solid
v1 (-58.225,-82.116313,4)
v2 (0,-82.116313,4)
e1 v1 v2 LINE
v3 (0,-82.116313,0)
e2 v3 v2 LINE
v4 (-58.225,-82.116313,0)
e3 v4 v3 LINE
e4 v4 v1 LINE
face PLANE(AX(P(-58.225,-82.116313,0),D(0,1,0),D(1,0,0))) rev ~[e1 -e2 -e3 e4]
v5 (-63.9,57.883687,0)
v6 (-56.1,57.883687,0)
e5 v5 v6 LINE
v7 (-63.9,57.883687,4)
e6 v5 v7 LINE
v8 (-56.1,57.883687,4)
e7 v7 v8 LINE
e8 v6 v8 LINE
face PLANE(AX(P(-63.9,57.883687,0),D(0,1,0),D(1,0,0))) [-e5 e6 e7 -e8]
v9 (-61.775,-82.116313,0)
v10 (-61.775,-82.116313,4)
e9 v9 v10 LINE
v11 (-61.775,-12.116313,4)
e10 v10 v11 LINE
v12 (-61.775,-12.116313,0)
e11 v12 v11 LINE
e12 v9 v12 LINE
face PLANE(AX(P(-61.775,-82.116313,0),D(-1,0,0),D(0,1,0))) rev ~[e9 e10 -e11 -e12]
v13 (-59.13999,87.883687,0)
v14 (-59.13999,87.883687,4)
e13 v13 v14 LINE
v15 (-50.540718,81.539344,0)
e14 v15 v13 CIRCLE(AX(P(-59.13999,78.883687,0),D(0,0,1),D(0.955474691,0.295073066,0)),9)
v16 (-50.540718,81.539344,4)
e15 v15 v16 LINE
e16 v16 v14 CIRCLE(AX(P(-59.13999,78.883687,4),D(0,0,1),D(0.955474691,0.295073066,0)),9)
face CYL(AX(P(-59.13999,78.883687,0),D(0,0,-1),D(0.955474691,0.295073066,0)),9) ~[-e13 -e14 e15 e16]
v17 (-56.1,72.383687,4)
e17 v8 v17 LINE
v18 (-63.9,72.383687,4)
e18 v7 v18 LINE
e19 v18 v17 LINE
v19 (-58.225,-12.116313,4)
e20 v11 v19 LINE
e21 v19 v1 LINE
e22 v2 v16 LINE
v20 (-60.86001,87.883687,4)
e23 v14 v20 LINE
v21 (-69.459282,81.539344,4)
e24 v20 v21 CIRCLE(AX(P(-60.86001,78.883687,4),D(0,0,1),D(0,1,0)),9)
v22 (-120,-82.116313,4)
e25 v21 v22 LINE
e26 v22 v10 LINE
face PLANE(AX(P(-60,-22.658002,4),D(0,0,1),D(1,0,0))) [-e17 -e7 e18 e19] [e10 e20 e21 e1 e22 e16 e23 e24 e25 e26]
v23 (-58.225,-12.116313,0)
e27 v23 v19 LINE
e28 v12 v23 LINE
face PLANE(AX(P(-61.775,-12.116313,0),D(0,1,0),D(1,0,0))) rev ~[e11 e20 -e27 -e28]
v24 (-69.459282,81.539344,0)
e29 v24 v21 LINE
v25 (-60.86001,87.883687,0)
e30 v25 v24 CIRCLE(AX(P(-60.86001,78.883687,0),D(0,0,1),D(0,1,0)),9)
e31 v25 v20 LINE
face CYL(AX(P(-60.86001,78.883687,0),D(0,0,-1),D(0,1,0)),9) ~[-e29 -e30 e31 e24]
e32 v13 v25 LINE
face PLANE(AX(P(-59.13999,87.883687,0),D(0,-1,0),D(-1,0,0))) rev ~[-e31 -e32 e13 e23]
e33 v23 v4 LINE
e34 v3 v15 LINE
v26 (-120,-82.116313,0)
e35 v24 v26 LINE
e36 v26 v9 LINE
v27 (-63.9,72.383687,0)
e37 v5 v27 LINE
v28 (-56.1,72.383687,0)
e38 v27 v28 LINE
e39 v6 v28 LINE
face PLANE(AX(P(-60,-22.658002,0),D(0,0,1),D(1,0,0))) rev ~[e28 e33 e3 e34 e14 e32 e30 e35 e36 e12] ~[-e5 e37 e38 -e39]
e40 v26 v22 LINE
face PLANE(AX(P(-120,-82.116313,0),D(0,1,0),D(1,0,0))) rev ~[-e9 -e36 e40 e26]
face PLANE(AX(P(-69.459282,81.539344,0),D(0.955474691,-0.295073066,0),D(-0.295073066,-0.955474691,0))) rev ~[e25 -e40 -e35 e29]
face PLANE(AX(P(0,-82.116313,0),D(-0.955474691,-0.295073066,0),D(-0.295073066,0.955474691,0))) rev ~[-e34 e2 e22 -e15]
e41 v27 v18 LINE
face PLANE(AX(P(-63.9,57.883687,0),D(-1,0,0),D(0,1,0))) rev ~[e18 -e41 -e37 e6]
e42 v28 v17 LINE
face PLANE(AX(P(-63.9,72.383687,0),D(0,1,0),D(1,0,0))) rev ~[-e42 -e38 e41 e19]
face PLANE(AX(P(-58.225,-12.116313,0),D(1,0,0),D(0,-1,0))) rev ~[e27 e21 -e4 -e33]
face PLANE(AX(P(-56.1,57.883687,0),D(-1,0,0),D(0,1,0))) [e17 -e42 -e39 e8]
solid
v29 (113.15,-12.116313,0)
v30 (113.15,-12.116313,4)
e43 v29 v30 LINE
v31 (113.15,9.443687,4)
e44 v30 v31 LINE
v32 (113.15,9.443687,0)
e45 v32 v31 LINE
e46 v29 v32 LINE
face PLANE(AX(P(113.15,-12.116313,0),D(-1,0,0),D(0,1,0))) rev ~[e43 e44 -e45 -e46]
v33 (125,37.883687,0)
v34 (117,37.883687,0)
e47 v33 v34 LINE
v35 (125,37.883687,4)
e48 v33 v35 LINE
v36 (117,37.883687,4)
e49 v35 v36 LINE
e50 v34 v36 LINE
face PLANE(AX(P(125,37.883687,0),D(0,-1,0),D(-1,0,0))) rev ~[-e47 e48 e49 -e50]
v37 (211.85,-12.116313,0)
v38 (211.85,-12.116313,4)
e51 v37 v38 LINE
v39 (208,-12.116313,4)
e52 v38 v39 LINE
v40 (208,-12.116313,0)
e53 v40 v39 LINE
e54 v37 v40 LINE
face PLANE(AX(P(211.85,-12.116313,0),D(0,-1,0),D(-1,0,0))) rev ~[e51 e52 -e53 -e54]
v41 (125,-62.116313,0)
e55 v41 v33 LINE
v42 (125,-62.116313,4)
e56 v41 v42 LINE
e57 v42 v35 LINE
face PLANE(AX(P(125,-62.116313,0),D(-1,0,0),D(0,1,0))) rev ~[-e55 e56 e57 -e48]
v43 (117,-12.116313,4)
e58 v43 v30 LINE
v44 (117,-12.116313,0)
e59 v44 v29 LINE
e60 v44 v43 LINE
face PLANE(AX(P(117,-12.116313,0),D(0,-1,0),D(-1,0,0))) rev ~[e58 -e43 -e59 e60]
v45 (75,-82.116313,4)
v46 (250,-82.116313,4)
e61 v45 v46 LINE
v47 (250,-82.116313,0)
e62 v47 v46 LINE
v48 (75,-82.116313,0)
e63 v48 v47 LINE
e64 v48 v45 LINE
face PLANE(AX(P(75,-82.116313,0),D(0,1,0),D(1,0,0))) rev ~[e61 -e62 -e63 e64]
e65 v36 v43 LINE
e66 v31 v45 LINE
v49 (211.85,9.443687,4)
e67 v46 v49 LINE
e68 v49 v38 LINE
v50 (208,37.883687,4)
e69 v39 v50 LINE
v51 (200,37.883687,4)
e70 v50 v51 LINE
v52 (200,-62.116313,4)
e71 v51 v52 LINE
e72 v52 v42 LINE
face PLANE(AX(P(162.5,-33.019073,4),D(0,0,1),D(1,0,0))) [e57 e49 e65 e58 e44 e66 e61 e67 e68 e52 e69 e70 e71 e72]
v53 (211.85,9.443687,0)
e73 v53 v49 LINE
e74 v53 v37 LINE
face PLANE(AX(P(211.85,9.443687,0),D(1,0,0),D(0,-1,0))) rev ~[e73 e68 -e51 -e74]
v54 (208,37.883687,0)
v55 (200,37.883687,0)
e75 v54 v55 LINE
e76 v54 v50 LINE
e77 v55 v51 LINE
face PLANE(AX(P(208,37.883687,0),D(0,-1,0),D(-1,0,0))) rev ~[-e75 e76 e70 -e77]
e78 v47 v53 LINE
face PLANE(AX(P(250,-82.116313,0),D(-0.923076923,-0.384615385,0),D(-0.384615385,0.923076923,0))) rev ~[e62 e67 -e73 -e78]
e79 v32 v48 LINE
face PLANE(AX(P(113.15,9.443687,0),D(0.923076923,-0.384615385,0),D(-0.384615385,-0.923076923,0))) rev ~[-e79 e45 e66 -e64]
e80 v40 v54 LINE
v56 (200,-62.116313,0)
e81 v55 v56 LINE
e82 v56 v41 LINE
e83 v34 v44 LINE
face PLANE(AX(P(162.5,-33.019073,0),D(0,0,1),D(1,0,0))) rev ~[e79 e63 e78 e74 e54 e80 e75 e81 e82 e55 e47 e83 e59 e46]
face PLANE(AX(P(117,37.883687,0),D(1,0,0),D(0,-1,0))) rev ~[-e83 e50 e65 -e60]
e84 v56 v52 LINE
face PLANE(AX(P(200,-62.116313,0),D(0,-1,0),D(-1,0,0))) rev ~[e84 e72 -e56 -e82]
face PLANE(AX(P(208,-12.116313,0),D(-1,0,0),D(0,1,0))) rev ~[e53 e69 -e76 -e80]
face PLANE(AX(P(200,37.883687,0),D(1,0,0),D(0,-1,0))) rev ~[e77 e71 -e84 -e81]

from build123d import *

# Parameters (mm, degrees)
F0_W     = 7.8
F0_H     = 14.5
F1_DEPTH = 4


# Not quite as in the source:
# - a feature names something its author has since deleted; it is built from what else it names


with BuildPart() as f1:
    # F0 (on Top) → F1 (new body)
    with BuildSketch(Plane.XY):
        with BuildLine():
            Line((-59.1399900081, 87.8836867213), (-60.8600099919, 87.8836867213))
            ThreePointArc((-60.8600099919, 87.8836867213), (-66.2031870254, 86.1259556468), (-69.4592822125, 81.5393443189))
            Line((-69.4592822125, 81.5393443189), (-120, -82.1163132787))
            Line((-120, -82.1163132787), (-61.775, -82.1163132787))
            Line((-61.775, -82.1163132787), (-61.775, -12.1163132787))
            Line((-61.775, -12.1163132787), (-58.225, -12.1163132787))
            Line((-58.225, -12.1163132787), (-58.225, -82.1163132787))
            Line((-58.225, -82.1163132787), (0, -82.1163132787))
            Line((0, -82.1163132787), (-50.5407177875, 81.5393443189))
            ThreePointArc((-50.5407177875, 81.5393443189), (-53.7968129746, 86.1259556468), (-59.1399900081, 87.8836867213))
        make_face()
        with Locations((-60, 65.1336867213)):
            Rectangle(F0_W, F0_H, mode=Mode.SUBTRACT)
    extrude(amount=F1_DEPTH)


with BuildPart() as f1b:
    # F0 (on Top) → F1, piece 2 (new body)
    with BuildSketch(Plane.XY):
        Polygon((125, -82.1163132787), (200, -82.1163132787), (250, -82.1163132787), (211.85, 9.4436867213), (211.85, -12.1163132787), (208, -12.1163132787), (208, 18.6836867213), (208, 37.8836867213), (200, 37.8836867213), (200, 24.5272498578), (200, -62.1163132787), (125, -62.1163132787), (125, 24.5272498578), (125, 37.8836867213), (117, 37.8836867213), (117, 18.6836867213), (117, -12.1163132787), (113.15, -12.1163132787), (113.15, 9.4436867213), (75, -82.1163132787), align=None)
    extrude(amount=F1_DEPTH)


solid = Compound([f1.part, f1b.part])
